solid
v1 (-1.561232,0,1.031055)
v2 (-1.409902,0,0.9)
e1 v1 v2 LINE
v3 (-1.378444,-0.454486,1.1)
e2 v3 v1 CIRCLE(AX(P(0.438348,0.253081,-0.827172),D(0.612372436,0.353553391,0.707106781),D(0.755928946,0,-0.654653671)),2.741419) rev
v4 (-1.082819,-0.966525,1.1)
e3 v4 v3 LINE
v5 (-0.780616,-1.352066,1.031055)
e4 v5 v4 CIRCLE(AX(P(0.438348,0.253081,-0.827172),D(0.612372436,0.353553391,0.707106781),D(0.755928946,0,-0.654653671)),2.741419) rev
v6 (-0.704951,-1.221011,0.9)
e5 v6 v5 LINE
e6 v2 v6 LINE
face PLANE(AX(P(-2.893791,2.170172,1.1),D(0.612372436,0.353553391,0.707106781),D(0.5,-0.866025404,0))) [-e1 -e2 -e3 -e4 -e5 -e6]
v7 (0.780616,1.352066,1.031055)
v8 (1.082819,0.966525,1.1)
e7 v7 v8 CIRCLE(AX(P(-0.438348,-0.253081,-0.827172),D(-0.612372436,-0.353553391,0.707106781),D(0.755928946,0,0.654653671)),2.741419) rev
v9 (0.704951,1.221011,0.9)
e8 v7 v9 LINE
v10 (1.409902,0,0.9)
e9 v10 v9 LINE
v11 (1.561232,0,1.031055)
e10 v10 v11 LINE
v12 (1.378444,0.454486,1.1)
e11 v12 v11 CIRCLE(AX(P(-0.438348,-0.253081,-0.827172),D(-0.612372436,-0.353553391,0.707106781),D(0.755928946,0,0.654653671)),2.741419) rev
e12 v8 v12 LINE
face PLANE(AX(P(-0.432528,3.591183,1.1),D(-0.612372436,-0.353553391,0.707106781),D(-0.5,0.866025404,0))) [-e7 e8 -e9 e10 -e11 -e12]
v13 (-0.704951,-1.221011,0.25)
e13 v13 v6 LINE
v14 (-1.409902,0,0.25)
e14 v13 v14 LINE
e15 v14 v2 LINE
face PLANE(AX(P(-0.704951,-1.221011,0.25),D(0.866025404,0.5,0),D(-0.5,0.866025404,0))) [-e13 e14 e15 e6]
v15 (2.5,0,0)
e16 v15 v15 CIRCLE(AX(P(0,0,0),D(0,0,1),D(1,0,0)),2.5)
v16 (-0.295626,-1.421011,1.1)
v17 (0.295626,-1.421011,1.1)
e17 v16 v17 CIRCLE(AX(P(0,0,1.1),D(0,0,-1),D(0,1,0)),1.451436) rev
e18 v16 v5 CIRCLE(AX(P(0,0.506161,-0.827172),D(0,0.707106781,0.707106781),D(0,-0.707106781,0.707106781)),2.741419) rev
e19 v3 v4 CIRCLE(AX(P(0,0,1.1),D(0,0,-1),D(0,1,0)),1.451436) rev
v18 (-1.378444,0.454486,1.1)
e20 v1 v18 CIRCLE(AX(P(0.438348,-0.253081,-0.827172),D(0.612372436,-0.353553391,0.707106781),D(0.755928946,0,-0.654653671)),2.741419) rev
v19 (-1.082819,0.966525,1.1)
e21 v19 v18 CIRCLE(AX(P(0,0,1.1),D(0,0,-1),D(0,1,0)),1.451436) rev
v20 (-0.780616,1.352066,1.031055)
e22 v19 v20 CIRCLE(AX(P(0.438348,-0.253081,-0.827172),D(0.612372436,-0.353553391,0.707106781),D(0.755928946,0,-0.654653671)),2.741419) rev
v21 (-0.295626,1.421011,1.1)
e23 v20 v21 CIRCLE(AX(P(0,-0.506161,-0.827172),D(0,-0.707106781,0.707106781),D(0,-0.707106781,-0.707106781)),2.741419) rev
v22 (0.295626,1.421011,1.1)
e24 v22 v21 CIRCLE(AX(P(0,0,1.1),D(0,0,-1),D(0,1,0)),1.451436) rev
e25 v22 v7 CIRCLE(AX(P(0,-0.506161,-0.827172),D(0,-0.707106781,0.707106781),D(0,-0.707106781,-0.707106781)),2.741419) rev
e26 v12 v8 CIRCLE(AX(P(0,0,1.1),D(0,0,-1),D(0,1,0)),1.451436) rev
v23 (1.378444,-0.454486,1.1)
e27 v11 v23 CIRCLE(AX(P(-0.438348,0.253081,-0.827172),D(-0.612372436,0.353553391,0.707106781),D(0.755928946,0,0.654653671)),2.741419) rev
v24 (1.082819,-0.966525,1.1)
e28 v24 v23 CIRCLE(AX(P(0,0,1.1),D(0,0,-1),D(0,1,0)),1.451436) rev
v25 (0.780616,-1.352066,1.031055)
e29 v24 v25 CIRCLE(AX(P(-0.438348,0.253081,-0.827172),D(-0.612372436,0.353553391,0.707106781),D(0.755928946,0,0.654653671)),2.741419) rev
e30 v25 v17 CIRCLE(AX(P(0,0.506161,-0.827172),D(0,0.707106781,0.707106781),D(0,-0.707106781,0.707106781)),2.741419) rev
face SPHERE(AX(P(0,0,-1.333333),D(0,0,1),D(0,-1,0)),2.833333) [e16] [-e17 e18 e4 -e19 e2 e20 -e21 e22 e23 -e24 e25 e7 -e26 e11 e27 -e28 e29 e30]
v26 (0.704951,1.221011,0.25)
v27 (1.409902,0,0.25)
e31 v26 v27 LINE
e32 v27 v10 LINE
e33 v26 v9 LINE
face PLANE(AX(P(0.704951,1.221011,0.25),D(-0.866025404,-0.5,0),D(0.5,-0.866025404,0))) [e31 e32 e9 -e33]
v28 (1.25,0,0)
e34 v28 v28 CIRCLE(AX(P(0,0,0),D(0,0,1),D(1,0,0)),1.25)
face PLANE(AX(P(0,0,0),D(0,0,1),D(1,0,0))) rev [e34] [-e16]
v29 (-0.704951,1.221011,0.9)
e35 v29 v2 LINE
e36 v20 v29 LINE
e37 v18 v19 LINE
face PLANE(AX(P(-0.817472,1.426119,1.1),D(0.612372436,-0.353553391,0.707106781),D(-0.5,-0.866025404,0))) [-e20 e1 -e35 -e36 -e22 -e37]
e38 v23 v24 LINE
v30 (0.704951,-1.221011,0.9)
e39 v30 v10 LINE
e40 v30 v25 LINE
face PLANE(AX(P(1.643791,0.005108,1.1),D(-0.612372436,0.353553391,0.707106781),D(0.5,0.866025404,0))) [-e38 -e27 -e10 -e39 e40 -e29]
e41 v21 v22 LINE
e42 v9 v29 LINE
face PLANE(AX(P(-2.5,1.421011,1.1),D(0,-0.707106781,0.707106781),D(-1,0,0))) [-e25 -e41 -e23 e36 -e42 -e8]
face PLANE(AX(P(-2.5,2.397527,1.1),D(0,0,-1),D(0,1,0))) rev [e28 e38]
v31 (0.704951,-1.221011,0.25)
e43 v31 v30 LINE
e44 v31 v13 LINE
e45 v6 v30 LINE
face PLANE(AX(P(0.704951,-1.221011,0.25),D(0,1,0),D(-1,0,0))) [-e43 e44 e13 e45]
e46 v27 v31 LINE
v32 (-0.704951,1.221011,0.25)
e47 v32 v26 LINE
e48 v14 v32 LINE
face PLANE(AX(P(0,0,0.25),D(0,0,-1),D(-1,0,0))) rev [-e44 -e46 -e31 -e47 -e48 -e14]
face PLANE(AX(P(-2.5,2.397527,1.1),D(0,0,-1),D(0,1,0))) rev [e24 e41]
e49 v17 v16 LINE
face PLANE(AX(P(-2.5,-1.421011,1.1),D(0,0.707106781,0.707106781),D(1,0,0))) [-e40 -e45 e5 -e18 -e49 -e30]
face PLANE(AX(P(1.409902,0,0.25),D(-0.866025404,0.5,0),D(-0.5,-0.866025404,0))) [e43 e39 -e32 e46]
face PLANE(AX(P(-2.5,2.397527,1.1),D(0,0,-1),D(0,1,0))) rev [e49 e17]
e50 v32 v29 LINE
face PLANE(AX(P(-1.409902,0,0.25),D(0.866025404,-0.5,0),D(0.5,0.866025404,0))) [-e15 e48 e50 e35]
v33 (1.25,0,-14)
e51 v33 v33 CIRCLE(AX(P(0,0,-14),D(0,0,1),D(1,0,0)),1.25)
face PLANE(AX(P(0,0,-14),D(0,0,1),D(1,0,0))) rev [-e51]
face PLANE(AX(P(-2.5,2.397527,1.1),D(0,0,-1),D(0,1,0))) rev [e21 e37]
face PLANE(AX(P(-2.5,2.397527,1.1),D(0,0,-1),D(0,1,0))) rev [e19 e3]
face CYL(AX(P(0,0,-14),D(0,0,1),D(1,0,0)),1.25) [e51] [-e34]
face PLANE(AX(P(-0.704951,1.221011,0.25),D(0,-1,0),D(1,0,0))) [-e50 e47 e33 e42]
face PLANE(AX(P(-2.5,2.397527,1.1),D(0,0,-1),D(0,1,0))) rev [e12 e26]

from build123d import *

# Parameters (mm, degrees)
SKETCH1_R               = 1.25
BOSS_EXTRUDE1_DEPTH     = 14
CUT_EXTRUDE1_DEPTH      = 1.25
CUT_EXTRUDE2_DEPTH      = 15.439529078
CUT_EXTRUDE2_DEPTH_BACK = 15.439529078
SKETCH6_W               = 1.249656436
SKETCH6_H               = 4.384153796
CHAMFER2_SIZE           = 0.2


with BuildPart() as part:
    # Sketch1 → Boss-Extrude1 (new body)
    with BuildSketch(Plane.XY):
        Circle(SKETCH1_R)
    extrude(amount=-BOSS_EXTRUDE1_DEPTH)

    # Sketch3 → Revolve1 (revolve)
    with BuildSketch(Plane(origin=(0, 0, 0), x_dir=(0, 0, -1), z_dir=(1, 0, 0)), mode=Mode.PRIVATE) as revolve1_sk:
        with BuildLine():
            ThreePointArc((-1.5, 0), (-1.096229956, 1.457737974), (0, 2.5))
            Line((0, 2.5), (0, 0))
            Line((0, 0), (-1.5, 0))
        make_face()
    revolve(revolve1_sk.sketch.rotate(Axis((0, 0, 1.5), (0, 0, -1)), 180), axis=Axis((0, 0, 1.5), (0, 0, -1)))

    # Sketch5 → Cut-Extrude1 (cut)
    with BuildSketch(Plane(origin=(0, 0, 1.5), x_dir=(-1, 0, 0), z_dir=(0, 0, -1))):
        Polygon((-1.409901945, 0), (-0.704950973, -1.221010901), (0.704950973, -1.221010901), (1.409901945, 0), (0.704950973, 1.221010901), (-0.704950973, 1.221010901), align=None)
    extrude(amount=CUT_EXTRUDE1_DEPTH, mode=Mode.SUBTRACT)

    # Sketch6 → Cut-Extrude2 (cut, two sides: drawn at the far end of the back side and taken through both)
    with BuildSketch(Plane(origin=(0, 0, 0), x_dir=(0, 0, -1), z_dir=(1, 0, 0)).offset(-CUT_EXTRUDE2_DEPTH_BACK)):
        with Locations((-1.724828218, 0.205450463)):
            Rectangle(SKETCH6_W, SKETCH6_H)
    extrude(amount=CUT_EXTRUDE2_DEPTH + CUT_EXTRUDE2_DEPTH_BACK, mode=Mode.SUBTRACT)

    # Chamfer2
    # the kernel refuses this chamfer: 0.2 mm, written as the material it takes off along each edge
    with BuildSketch(Plane(origin=(1.21928757, 1.221010901, 1.1), x_dir=(1.0390370186618431e-14, 0.9996219169112966, 0.02749587661058733), z_dir=(-1, 0, 0))) as chamfer2_piece_1_section:
        Polygon((CHAMFER2_SIZE * 0.999621916911, CHAMFER2_SIZE * 0.0274958766106), (-CHAMFER2_SIZE * 0.0274958766106, CHAMFER2_SIZE * 0.999621916911), (0, 0), align=None)
    chamfer2_piece_1 = extrude(amount=2.43857514, mode=Mode.PRIVATE)
    chamfer2_piece_1 = split(chamfer2_piece_1, bisect_by=Plane(origin=(0.501104512, 1.574083329, 1.032865614), z_dir=(-0.8660254037844416, -0.49999999999999495, 0)), keep=Keep.TOP, mode=Mode.PRIVATE)
    chamfer2_piece_1 = split(chamfer2_piece_1, bisect_by=Plane(origin=(-0.501104512, 1.574083329, 1.032865614), z_dir=(0.8660254037844347, -0.500000000000007, 0)), keep=Keep.TOP, mode=Mode.PRIVATE)
    add(chamfer2_piece_1, mode=Mode.SUBTRACT)
    with BuildSketch(Plane(origin=(1.667070244, -0.44542856, 1.1), x_dir=(0.8656979742248833, 0.4998109584556433, 0.027495876610586282), z_dir=(-0.49999999999999495, 0.8660254037844416, 0))) as chamfer2_piece_2_section:
        Polygon((CHAMFER2_SIZE * 0.999621916911, CHAMFER2_SIZE * 0.0274958766106), (-CHAMFER2_SIZE * 0.0274958766106, CHAMFER2_SIZE * 0.999621916911), (0, 0), align=None)
    chamfer2_piece_2 = extrude(amount=2.43857514, mode=Mode.PRIVATE)
    chamfer2_piece_2 = split(chamfer2_piece_2, bisect_by=Plane(origin=(1.613748406, 0.353072427, 1.032865614), z_dir=(-0.8660254037844382, 0.500000000000001, 0)), keep=Keep.TOP, mode=Mode.PRIVATE)
    chamfer2_piece_2 = split(chamfer2_piece_2, bisect_by=Plane(origin=(1.112643894, 1.221010901, 1.032865614), z_dir=(0, -1, 0)), keep=Keep.TOP, mode=Mode.PRIVATE)
    add(chamfer2_piece_2, mode=Mode.SUBTRACT)
    with BuildSketch(Plane(origin=(0.447782674, -1.666439461, 1.1), x_dir=(0.8656979742248797, -0.4998109584556493, 0.02749587661058626), z_dir=(0.500000000000001, 0.8660254037844382, 0))) as chamfer2_piece_3_section:
        Polygon((CHAMFER2_SIZE * 0.999621916911, CHAMFER2_SIZE * 0.0274958766106), (-CHAMFER2_SIZE * 0.0274958766106, CHAMFER2_SIZE * 0.999621916911), (0, 0), align=None)
    chamfer2_piece_3 = extrude(amount=2.43857514, mode=Mode.PRIVATE)
    chamfer2_piece_3 = split(chamfer2_piece_3, bisect_by=Plane(origin=(1.112643894, -1.221010901, 1.032865614), z_dir=(0, 1, 0)), keep=Keep.TOP, mode=Mode.PRIVATE)
    chamfer2_piece_3 = split(chamfer2_piece_3, bisect_by=Plane(origin=(1.613748406, -0.353072427, 1.032865614), z_dir=(-0.8660254037844416, -0.49999999999999495, 0)), keep=Keep.TOP, mode=Mode.PRIVATE)
    add(chamfer2_piece_3, mode=Mode.SUBTRACT)
    with BuildSketch(Plane(origin=(-1.21928757, -1.221010901, 1.1), x_dir=(-3.30602687756041e-15, -0.9996219169112968, 0.027495876610586285), z_dir=(1, 0, 0))) as chamfer2_piece_4_section:
        Polygon((CHAMFER2_SIZE * 0.999621916911, CHAMFER2_SIZE * 0.0274958766106), (-CHAMFER2_SIZE * 0.0274958766106, CHAMFER2_SIZE * 0.999621916911), (0, 0), align=None)
    chamfer2_piece_4 = extrude(amount=2.43857514, mode=Mode.PRIVATE)
    chamfer2_piece_4 = split(chamfer2_piece_4, bisect_by=Plane(origin=(-0.501104512, -1.574083329, 1.032865614), z_dir=(0.8660254037844417, 0.49999999999999484, 0)), keep=Keep.TOP, mode=Mode.PRIVATE)
    chamfer2_piece_4 = split(chamfer2_piece_4, bisect_by=Plane(origin=(0.501104512, -1.574083329, 1.032865614), z_dir=(-0.8660254037844382, 0.500000000000001, 0)), keep=Keep.TOP, mode=Mode.PRIVATE)
    add(chamfer2_piece_4, mode=Mode.SUBTRACT)
    with BuildSketch(Plane(origin=(-1.667070244, 0.44542856, 1.1), x_dir=(-0.8656979742248834, -0.4998109584556432, 0.027495876610586265), z_dir=(0.49999999999999484, -0.8660254037844417, 0))) as chamfer2_piece_5_section:
        Polygon((CHAMFER2_SIZE * 0.999621916911, CHAMFER2_SIZE * 0.0274958766106), (-CHAMFER2_SIZE * 0.0274958766106, CHAMFER2_SIZE * 0.999621916911), (0, 0), align=None)
    chamfer2_piece_5 = extrude(amount=2.43857514, mode=Mode.PRIVATE)
    chamfer2_piece_5 = split(chamfer2_piece_5, bisect_by=Plane(origin=(-1.112643894, -1.221010901, 1.032865614), z_dir=(0, 1, 0)), keep=Keep.TOP, mode=Mode.PRIVATE)
    chamfer2_piece_5 = split(chamfer2_piece_5, bisect_by=Plane(origin=(-1.613748406, -0.353072427, 1.032865614), z_dir=(0.8660254037844347, -0.500000000000007, 0)), keep=Keep.TOP, mode=Mode.PRIVATE)
    add(chamfer2_piece_5, mode=Mode.SUBTRACT)
    with BuildSketch(Plane(origin=(-0.447782674, 1.666439461, 1.1), x_dir=(-0.8656979742248764, 0.4998109584556554, 0.027495876610586265), z_dir=(-0.500000000000007, -0.8660254037844347, 0))) as chamfer2_piece_6_section:
        Polygon((CHAMFER2_SIZE * 0.999621916911, CHAMFER2_SIZE * 0.0274958766106), (-CHAMFER2_SIZE * 0.0274958766106, CHAMFER2_SIZE * 0.999621916911), (0, 0), align=None)
    chamfer2_piece_6 = extrude(amount=2.43857514, mode=Mode.PRIVATE)
    chamfer2_piece_6 = split(chamfer2_piece_6, bisect_by=Plane(origin=(-1.112643894, 1.221010901, 1.032865614), z_dir=(0, -1, 0)), keep=Keep.TOP, mode=Mode.PRIVATE)
    chamfer2_piece_6 = split(chamfer2_piece_6, bisect_by=Plane(origin=(-1.613748406, 0.353072427, 1.032865614), z_dir=(0.8660254037844417, 0.49999999999999484, 0)), keep=Keep.TOP, mode=Mode.PRIVATE)
    add(chamfer2_piece_6, mode=Mode.SUBTRACT)
    with BuildSketch(Plane(origin=(1.667070244, -0.44542856, 1.1), x_dir=(0.8656979742248833, 0.4998109584556433, 0.027495876610586282), z_dir=(-0.49999999999999495, 0.8660254037844416, 0))) as chamfer2_piece_7a_section:
        Polygon((CHAMFER2_SIZE * 0.999621916911, CHAMFER2_SIZE * 0.0274958766106), (-CHAMFER2_SIZE * 0.0274958766106, CHAMFER2_SIZE * 0.999621916911), (0, 0), align=None)
    chamfer2_piece_7a = extrude(amount=2.43857514, mode=Mode.PRIVATE)
    chamfer2_piece_7a = split(chamfer2_piece_7a, bisect_by=Plane(origin=(0.645691333, 1.221010901, 1.035460513), z_dir=(0, 1, 0)), keep=Keep.TOP, mode=Mode.PRIVATE)
    with BuildSketch(Plane(origin=(1.21928757, 1.221010901, 1.1), x_dir=(1.0390370186618431e-14, 0.9996219169112966, 0.02749587661058733), z_dir=(-1, 0, 0))) as chamfer2_piece_7b_section:
        Polygon((CHAMFER2_SIZE * 0.999621916911, CHAMFER2_SIZE * 0.0274958766106), (-CHAMFER2_SIZE * 0.0274958766106, CHAMFER2_SIZE * 0.999621916911), (0, 0), align=None)
    chamfer2_piece_7b = extrude(amount=2.43857514, mode=Mode.PRIVATE)
    chamfer2_piece_7b = split(chamfer2_piece_7b, bisect_by=Plane(origin=(0.734580793, 1.169690548, 1.035460513), z_dir=(0.8660254037844416, 0.49999999999999495, 0)), keep=Keep.TOP, mode=Mode.PRIVATE)
    chamfer2_piece_7 = chamfer2_piece_7a & chamfer2_piece_7b
    add(chamfer2_piece_7, mode=Mode.SUBTRACT)
    with BuildSketch(Plane(origin=(1.21928757, 1.221010901, 1.1), x_dir=(1.0390370186618431e-14, 0.9996219169112966, 0.02749587661058733), z_dir=(-1, 0, 0))) as chamfer2_piece_8a_section:
        Polygon((CHAMFER2_SIZE * 0.999621916911, CHAMFER2_SIZE * 0.0274958766106), (-CHAMFER2_SIZE * 0.0274958766106, CHAMFER2_SIZE * 0.999621916911), (0, 0), align=None)
    chamfer2_piece_8a = extrude(amount=2.43857514, mode=Mode.PRIVATE)
    chamfer2_piece_8a = split(chamfer2_piece_8a, bisect_by=Plane(origin=(-0.734580793, 1.169690548, 1.035460513), z_dir=(-0.8660254037844347, 0.500000000000007, 0)), keep=Keep.TOP, mode=Mode.PRIVATE)
    with BuildSketch(Plane(origin=(-0.447782674, 1.666439461, 1.1), x_dir=(-0.8656979742248764, 0.4998109584556554, 0.027495876610586265), z_dir=(-0.500000000000007, -0.8660254037844347, 0))) as chamfer2_piece_8b_section:
        Polygon((CHAMFER2_SIZE * 0.999621916911, CHAMFER2_SIZE * 0.0274958766106), (-CHAMFER2_SIZE * 0.0274958766106, CHAMFER2_SIZE * 0.999621916911), (0, 0), align=None)
    chamfer2_piece_8b = extrude(amount=2.43857514, mode=Mode.PRIVATE)
    chamfer2_piece_8b = split(chamfer2_piece_8b, bisect_by=Plane(origin=(-0.645691333, 1.221010901, 1.035460513), z_dir=(0, 1, 0)), keep=Keep.TOP, mode=Mode.PRIVATE)
    chamfer2_piece_8 = chamfer2_piece_8a & chamfer2_piece_8b
    add(chamfer2_piece_8, mode=Mode.SUBTRACT)
    with BuildSketch(Plane(origin=(0.447782674, -1.666439461, 1.1), x_dir=(0.8656979742248797, -0.4998109584556493, 0.02749587661058626), z_dir=(0.500000000000001, 0.8660254037844382, 0))) as chamfer2_piece_9a_section:
        Polygon((CHAMFER2_SIZE * 0.999621916911, CHAMFER2_SIZE * 0.0274958766106), (-CHAMFER2_SIZE * 0.0274958766106, CHAMFER2_SIZE * 0.999621916911), (0, 0), align=None)
    chamfer2_piece_9a = extrude(amount=2.43857514, mode=Mode.PRIVATE)
    chamfer2_piece_9a = split(chamfer2_piece_9a, bisect_by=Plane(origin=(1.380272125, 0.051320354, 1.035460513), z_dir=(0.8660254037844416, 0.49999999999999495, 0)), keep=Keep.TOP, mode=Mode.PRIVATE)
    with BuildSketch(Plane(origin=(1.667070244, -0.44542856, 1.1), x_dir=(0.8656979742248833, 0.4998109584556433, 0.027495876610586282), z_dir=(-0.49999999999999495, 0.8660254037844416, 0))) as chamfer2_piece_9b_section:
        Polygon((CHAMFER2_SIZE * 0.999621916911, CHAMFER2_SIZE * 0.0274958766106), (-CHAMFER2_SIZE * 0.0274958766106, CHAMFER2_SIZE * 0.999621916911), (0, 0), align=None)
    chamfer2_piece_9b = extrude(amount=2.43857514, mode=Mode.PRIVATE)
    chamfer2_piece_9b = split(chamfer2_piece_9b, bisect_by=Plane(origin=(1.380272125, -0.051320354, 1.035460513), z_dir=(0.8660254037844382, -0.500000000000001, 0)), keep=Keep.TOP, mode=Mode.PRIVATE)
    chamfer2_piece_9 = chamfer2_piece_9a & chamfer2_piece_9b
    add(chamfer2_piece_9, mode=Mode.SUBTRACT)
    with BuildSketch(Plane(origin=(-1.21928757, -1.221010901, 1.1), x_dir=(-3.30602687756041e-15, -0.9996219169112968, 0.027495876610586285), z_dir=(1, 0, 0))) as chamfer2_piece_10a_section:
        Polygon((CHAMFER2_SIZE * 0.999621916911, CHAMFER2_SIZE * 0.0274958766106), (-CHAMFER2_SIZE * 0.0274958766106, CHAMFER2_SIZE * 0.999621916911), (0, 0), align=None)
    chamfer2_piece_10a = extrude(amount=2.43857514, mode=Mode.PRIVATE)
    chamfer2_piece_10a = split(chamfer2_piece_10a, bisect_by=Plane(origin=(0.734580793, -1.169690548, 1.035460513), z_dir=(0.8660254037844382, -0.500000000000001, 0)), keep=Keep.TOP, mode=Mode.PRIVATE)
    with BuildSketch(Plane(origin=(0.447782674, -1.666439461, 1.1), x_dir=(0.8656979742248797, -0.4998109584556493, 0.02749587661058626), z_dir=(0.500000000000001, 0.8660254037844382, 0))) as chamfer2_piece_10b_section:
        Polygon((CHAMFER2_SIZE * 0.999621916911, CHAMFER2_SIZE * 0.0274958766106), (-CHAMFER2_SIZE * 0.0274958766106, CHAMFER2_SIZE * 0.999621916911), (0, 0), align=None)
    chamfer2_piece_10b = extrude(amount=2.43857514, mode=Mode.PRIVATE)
    chamfer2_piece_10b = split(chamfer2_piece_10b, bisect_by=Plane(origin=(0.645691333, -1.221010901, 1.035460513), z_dir=(0, -1, 0)), keep=Keep.TOP, mode=Mode.PRIVATE)
    chamfer2_piece_10 = chamfer2_piece_10a & chamfer2_piece_10b
    add(chamfer2_piece_10, mode=Mode.SUBTRACT)
    with BuildSketch(Plane(origin=(-1.21928757, -1.221010901, 1.1), x_dir=(-3.30602687756041e-15, -0.9996219169112968, 0.027495876610586285), z_dir=(1, 0, 0))) as chamfer2_piece_11a_section:
        Polygon((CHAMFER2_SIZE * 0.999621916911, CHAMFER2_SIZE * 0.0274958766106), (-CHAMFER2_SIZE * 0.0274958766106, CHAMFER2_SIZE * 0.999621916911), (0, 0), align=None)
    chamfer2_piece_11a = extrude(amount=2.43857514, mode=Mode.PRIVATE)
    chamfer2_piece_11a = split(chamfer2_piece_11a, bisect_by=Plane(origin=(-0.734580793, -1.169690548, 1.035460513), z_dir=(-0.8660254037844417, -0.49999999999999484, 0)), keep=Keep.TOP, mode=Mode.PRIVATE)
    with BuildSketch(Plane(origin=(-1.667070244, 0.44542856, 1.1), x_dir=(-0.8656979742248834, -0.4998109584556432, 0.027495876610586265), z_dir=(0.49999999999999484, -0.8660254037844417, 0))) as chamfer2_piece_11b_section:
        Polygon((CHAMFER2_SIZE * 0.999621916911, CHAMFER2_SIZE * 0.0274958766106), (-CHAMFER2_SIZE * 0.0274958766106, CHAMFER2_SIZE * 0.999621916911), (0, 0), align=None)
    chamfer2_piece_11b = extrude(amount=2.43857514, mode=Mode.PRIVATE)
    chamfer2_piece_11b = split(chamfer2_piece_11b, bisect_by=Plane(origin=(-0.645691333, -1.221010901, 1.035460513), z_dir=(0, -1, 0)), keep=Keep.TOP, mode=Mode.PRIVATE)
    chamfer2_piece_11 = chamfer2_piece_11a & chamfer2_piece_11b
    add(chamfer2_piece_11, mode=Mode.SUBTRACT)
    with BuildSketch(Plane(origin=(-0.447782674, 1.666439461, 1.1), x_dir=(-0.8656979742248764, 0.4998109584556554, 0.027495876610586265), z_dir=(-0.500000000000007, -0.8660254037844347, 0))) as chamfer2_piece_12a_section:
        Polygon((CHAMFER2_SIZE * 0.999621916911, CHAMFER2_SIZE * 0.0274958766106), (-CHAMFER2_SIZE * 0.0274958766106, CHAMFER2_SIZE * 0.999621916911), (0, 0), align=None)
    chamfer2_piece_12a = extrude(amount=2.43857514, mode=Mode.PRIVATE)
    chamfer2_piece_12a = split(chamfer2_piece_12a, bisect_by=Plane(origin=(-1.380272125, -0.051320354, 1.035460513), z_dir=(-0.8660254037844417, -0.49999999999999484, 0)), keep=Keep.TOP, mode=Mode.PRIVATE)
    with BuildSketch(Plane(origin=(-1.667070244, 0.44542856, 1.1), x_dir=(-0.8656979742248834, -0.4998109584556432, 0.027495876610586265), z_dir=(0.49999999999999484, -0.8660254037844417, 0))) as chamfer2_piece_12b_section:
        Polygon((CHAMFER2_SIZE * 0.999621916911, CHAMFER2_SIZE * 0.0274958766106), (-CHAMFER2_SIZE * 0.0274958766106, CHAMFER2_SIZE * 0.999621916911), (0, 0), align=None)
    chamfer2_piece_12b = extrude(amount=2.43857514, mode=Mode.PRIVATE)
    chamfer2_piece_12b = split(chamfer2_piece_12b, bisect_by=Plane(origin=(-1.380272125, 0.051320354, 1.035460513), z_dir=(-0.8660254037844347, 0.500000000000007, 0)), keep=Keep.TOP, mode=Mode.PRIVATE)
    chamfer2_piece_12 = chamfer2_piece_12a & chamfer2_piece_12b
    add(chamfer2_piece_12, mode=Mode.SUBTRACT)


solid = part.part
